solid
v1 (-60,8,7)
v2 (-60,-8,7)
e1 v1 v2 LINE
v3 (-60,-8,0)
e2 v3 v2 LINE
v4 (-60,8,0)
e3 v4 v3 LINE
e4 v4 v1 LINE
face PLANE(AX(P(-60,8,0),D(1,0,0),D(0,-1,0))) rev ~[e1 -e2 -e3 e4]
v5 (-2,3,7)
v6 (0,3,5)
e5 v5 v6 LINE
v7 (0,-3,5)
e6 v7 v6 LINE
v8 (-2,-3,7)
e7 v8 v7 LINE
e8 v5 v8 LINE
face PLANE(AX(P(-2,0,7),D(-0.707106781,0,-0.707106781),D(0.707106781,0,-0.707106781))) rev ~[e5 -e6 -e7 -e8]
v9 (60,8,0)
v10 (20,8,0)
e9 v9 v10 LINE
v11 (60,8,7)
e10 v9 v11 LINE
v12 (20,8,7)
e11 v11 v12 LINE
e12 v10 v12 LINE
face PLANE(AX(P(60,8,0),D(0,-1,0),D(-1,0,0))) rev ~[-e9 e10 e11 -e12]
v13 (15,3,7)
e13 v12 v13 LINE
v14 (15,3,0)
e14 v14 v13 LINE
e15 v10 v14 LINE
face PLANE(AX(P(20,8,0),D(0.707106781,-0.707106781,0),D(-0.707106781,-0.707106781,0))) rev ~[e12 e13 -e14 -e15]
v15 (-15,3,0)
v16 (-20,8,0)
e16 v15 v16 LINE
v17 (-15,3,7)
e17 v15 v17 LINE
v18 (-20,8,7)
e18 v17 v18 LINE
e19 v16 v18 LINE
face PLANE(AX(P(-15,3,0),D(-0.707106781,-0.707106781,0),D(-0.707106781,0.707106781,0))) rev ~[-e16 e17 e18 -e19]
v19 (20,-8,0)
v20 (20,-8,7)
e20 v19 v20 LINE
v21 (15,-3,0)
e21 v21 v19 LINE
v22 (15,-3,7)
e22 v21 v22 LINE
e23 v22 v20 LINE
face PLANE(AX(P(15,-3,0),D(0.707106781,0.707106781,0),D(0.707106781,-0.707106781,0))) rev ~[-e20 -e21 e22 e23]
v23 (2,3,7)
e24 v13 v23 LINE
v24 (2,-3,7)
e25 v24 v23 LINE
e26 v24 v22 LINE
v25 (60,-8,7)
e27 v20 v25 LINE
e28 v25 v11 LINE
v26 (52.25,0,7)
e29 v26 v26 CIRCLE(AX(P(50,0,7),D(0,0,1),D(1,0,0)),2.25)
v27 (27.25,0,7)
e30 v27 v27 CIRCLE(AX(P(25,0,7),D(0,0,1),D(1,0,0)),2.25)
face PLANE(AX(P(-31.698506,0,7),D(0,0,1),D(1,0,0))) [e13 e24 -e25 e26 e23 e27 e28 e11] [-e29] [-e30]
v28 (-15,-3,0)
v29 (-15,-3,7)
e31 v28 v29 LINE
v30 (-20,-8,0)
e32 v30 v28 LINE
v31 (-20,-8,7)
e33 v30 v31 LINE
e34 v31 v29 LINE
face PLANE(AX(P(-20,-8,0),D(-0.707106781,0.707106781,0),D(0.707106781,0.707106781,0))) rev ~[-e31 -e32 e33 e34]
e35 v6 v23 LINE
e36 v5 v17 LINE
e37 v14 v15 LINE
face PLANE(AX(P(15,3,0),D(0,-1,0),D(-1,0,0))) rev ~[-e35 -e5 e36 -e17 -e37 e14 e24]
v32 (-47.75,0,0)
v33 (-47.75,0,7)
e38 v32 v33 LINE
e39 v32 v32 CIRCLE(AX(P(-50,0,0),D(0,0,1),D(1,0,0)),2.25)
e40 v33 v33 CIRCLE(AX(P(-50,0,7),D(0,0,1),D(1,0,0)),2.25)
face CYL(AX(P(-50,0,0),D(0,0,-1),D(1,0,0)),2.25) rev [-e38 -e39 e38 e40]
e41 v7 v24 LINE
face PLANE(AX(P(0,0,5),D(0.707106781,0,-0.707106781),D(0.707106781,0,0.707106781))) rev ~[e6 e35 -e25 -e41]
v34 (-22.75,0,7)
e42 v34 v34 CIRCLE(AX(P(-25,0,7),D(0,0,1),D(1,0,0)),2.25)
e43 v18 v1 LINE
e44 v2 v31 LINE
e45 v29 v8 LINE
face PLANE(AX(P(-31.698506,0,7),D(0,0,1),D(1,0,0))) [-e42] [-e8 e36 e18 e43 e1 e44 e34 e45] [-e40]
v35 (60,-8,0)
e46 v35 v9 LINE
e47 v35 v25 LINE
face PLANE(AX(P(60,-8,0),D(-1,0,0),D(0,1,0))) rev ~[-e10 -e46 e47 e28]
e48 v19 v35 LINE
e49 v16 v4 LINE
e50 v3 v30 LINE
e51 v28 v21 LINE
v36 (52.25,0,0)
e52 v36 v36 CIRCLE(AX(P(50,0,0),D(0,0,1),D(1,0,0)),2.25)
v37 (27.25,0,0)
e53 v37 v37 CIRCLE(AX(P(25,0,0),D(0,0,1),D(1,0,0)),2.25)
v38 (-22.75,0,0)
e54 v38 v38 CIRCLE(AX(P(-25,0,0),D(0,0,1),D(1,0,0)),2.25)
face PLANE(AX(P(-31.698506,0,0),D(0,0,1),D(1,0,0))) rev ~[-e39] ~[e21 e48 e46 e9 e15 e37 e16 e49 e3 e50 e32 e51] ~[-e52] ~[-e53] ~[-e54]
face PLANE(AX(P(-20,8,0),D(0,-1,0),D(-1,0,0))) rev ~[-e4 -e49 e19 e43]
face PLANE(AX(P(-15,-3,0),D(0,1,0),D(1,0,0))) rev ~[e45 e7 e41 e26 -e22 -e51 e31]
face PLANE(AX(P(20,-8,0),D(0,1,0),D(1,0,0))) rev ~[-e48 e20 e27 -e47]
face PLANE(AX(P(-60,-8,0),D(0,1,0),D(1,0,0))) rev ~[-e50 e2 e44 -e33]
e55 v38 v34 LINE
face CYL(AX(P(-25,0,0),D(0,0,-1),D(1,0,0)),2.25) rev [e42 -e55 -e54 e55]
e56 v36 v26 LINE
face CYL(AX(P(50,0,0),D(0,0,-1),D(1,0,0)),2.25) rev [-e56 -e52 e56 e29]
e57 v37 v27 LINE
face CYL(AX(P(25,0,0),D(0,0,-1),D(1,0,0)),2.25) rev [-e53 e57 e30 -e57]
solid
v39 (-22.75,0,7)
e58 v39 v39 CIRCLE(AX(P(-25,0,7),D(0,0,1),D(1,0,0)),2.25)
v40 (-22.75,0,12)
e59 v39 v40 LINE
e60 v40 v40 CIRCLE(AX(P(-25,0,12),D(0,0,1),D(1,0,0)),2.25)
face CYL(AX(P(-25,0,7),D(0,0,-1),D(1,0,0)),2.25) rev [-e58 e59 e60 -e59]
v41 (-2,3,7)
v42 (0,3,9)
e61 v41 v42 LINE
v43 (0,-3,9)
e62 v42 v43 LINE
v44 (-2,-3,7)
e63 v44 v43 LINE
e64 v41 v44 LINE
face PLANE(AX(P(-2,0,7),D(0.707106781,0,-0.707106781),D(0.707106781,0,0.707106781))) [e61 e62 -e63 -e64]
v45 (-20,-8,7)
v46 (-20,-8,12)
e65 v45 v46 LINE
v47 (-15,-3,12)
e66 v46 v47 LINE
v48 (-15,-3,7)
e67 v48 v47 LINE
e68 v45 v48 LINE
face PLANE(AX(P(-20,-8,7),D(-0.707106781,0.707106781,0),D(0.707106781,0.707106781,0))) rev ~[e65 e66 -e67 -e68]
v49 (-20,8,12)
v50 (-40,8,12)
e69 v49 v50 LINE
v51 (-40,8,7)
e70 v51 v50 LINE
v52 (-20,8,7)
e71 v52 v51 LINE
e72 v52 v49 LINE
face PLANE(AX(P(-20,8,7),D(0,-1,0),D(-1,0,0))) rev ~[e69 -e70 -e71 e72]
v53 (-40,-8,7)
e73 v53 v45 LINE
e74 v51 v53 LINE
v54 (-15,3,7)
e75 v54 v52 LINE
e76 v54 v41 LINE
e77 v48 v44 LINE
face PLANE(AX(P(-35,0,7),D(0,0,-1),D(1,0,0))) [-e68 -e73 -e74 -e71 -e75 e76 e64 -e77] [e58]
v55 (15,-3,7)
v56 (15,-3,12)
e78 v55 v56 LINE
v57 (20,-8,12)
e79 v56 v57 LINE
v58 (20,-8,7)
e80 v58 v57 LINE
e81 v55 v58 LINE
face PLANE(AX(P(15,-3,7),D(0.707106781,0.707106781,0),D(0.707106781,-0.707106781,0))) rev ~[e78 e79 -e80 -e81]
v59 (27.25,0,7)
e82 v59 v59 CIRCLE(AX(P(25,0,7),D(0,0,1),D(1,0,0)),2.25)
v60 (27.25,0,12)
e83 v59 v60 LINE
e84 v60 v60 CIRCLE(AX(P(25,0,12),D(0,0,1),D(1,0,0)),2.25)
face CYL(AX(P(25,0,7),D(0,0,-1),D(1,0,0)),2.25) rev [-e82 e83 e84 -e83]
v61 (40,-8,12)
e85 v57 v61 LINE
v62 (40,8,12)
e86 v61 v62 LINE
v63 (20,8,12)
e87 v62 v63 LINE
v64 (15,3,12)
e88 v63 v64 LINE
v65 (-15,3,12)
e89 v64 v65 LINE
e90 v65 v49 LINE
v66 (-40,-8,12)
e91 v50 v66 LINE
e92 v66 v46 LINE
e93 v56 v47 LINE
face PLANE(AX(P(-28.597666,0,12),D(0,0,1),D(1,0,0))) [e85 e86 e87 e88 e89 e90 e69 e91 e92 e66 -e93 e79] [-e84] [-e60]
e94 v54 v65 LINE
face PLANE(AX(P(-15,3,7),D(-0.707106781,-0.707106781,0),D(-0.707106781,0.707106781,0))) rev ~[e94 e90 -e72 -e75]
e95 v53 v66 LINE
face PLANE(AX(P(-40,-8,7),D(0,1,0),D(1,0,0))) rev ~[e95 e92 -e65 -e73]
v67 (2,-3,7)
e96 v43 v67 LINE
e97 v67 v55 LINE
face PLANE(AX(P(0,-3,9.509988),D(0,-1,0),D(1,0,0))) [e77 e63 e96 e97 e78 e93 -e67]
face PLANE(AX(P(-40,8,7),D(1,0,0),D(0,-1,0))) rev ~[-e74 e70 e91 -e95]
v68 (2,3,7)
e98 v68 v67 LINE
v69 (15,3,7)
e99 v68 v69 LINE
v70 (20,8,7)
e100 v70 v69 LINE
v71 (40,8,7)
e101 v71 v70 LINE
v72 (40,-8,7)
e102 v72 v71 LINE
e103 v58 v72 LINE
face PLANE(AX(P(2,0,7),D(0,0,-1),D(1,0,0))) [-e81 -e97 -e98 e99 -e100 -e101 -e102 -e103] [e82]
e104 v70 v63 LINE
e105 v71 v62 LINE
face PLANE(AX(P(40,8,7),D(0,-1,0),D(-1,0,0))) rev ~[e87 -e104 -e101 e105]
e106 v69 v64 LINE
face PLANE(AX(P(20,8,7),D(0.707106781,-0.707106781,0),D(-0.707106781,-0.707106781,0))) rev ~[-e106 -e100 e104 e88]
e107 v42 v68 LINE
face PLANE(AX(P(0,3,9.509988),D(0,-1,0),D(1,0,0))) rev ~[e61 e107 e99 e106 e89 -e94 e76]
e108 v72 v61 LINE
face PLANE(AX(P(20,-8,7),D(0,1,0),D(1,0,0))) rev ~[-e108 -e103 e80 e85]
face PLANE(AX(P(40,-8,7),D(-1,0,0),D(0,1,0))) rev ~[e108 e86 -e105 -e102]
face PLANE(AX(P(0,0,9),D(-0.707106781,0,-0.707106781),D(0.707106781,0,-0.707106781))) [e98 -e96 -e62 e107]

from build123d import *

# Parameters (mm, degrees)
F0_R     = 2.25
F1_DEPTH = 7
F3_DEPTH = 3
F4_DEPTH = 3
F5_R     = 2.25
F6_DEPTH = 5
F7_DEPTH = 5


with BuildPart() as f1:
    # F0 (on Top) → F1 (new body)
    with BuildSketch(Plane.XY):
        Polygon((0, -3), (0, 0), (0, 3), (-15, 3), (-20, 8), (-30, 8), (-54.389398545, 8), (-60, 8), (-60, -8), (-54.389398545, -8), (-30, -8), (-20, -8), (-15, -3), align=None)
        with Locations((-50, 0)):
            Circle(F0_R, mode=Mode.SUBTRACT)
        with Locations((-25, 0)):
            Circle(F0_R, mode=Mode.SUBTRACT)
        Polygon((0, 3), (0, 0), (0, -3), (15, -3), (20, -8), (30, -8), (53.1751337647, -8), (60, -8), (60, 8), (53.1751337647, 8), (30, 8), (20, 8), (15, 3), align=None)
        with Locations((25, 0)):
            Circle(F0_R, mode=Mode.SUBTRACT)
        with Locations((50, 0)):
            Circle(F0_R, mode=Mode.SUBTRACT)
    extrude(amount=F1_DEPTH)

    # F2 (on Front) → F3 (cut, symmetric)
    with BuildSketch(Plane.XZ):
        Polygon((2, 7), (-2, 7), (0, 5), align=None)
    extrude(amount=F3_DEPTH, both=True, mode=Mode.SUBTRACT)


with BuildPart() as f4:
    # F2 (on Front) → F4 (new body, symmetric)
    with BuildSketch(Plane.XZ):
        Polygon((-35, 7), (-15, 7), (-2, 7), (0, 9), (2, 7), (15, 7), (35, 7), (35, 12), (-35, 12), align=None)
    extrude(amount=F4_DEPTH, both=True)

    # F5 (on face) → F6 (join)
    with BuildSketch(Plane.XY.offset(7)):
        Polygon((-15, -3), (-15, 3), (-20, 8), (-40, 8), (-40, -8), (-20, -8), align=None)
        with Locations((-25, 0)):
            Circle(F5_R, mode=Mode.SUBTRACT)
        Polygon((20, 8), (15, 3), (15, -3), (20, -8), (40, -8), (40, 8), align=None)
        with Locations((25, 0)):
            Circle(F5_R, mode=Mode.SUBTRACT)
    extrude(amount=F6_DEPTH)

    # F5 (on face) → F7 (cut)
    with BuildSketch(Plane.XY.offset(7)):
        with Locations((-25, 0)):
            Circle(F5_R)
        with Locations((25, 0)):
            Circle(F5_R)
    extrude(amount=F7_DEPTH, mode=Mode.SUBTRACT)


solid = Compound([f1.part, f4.part])
